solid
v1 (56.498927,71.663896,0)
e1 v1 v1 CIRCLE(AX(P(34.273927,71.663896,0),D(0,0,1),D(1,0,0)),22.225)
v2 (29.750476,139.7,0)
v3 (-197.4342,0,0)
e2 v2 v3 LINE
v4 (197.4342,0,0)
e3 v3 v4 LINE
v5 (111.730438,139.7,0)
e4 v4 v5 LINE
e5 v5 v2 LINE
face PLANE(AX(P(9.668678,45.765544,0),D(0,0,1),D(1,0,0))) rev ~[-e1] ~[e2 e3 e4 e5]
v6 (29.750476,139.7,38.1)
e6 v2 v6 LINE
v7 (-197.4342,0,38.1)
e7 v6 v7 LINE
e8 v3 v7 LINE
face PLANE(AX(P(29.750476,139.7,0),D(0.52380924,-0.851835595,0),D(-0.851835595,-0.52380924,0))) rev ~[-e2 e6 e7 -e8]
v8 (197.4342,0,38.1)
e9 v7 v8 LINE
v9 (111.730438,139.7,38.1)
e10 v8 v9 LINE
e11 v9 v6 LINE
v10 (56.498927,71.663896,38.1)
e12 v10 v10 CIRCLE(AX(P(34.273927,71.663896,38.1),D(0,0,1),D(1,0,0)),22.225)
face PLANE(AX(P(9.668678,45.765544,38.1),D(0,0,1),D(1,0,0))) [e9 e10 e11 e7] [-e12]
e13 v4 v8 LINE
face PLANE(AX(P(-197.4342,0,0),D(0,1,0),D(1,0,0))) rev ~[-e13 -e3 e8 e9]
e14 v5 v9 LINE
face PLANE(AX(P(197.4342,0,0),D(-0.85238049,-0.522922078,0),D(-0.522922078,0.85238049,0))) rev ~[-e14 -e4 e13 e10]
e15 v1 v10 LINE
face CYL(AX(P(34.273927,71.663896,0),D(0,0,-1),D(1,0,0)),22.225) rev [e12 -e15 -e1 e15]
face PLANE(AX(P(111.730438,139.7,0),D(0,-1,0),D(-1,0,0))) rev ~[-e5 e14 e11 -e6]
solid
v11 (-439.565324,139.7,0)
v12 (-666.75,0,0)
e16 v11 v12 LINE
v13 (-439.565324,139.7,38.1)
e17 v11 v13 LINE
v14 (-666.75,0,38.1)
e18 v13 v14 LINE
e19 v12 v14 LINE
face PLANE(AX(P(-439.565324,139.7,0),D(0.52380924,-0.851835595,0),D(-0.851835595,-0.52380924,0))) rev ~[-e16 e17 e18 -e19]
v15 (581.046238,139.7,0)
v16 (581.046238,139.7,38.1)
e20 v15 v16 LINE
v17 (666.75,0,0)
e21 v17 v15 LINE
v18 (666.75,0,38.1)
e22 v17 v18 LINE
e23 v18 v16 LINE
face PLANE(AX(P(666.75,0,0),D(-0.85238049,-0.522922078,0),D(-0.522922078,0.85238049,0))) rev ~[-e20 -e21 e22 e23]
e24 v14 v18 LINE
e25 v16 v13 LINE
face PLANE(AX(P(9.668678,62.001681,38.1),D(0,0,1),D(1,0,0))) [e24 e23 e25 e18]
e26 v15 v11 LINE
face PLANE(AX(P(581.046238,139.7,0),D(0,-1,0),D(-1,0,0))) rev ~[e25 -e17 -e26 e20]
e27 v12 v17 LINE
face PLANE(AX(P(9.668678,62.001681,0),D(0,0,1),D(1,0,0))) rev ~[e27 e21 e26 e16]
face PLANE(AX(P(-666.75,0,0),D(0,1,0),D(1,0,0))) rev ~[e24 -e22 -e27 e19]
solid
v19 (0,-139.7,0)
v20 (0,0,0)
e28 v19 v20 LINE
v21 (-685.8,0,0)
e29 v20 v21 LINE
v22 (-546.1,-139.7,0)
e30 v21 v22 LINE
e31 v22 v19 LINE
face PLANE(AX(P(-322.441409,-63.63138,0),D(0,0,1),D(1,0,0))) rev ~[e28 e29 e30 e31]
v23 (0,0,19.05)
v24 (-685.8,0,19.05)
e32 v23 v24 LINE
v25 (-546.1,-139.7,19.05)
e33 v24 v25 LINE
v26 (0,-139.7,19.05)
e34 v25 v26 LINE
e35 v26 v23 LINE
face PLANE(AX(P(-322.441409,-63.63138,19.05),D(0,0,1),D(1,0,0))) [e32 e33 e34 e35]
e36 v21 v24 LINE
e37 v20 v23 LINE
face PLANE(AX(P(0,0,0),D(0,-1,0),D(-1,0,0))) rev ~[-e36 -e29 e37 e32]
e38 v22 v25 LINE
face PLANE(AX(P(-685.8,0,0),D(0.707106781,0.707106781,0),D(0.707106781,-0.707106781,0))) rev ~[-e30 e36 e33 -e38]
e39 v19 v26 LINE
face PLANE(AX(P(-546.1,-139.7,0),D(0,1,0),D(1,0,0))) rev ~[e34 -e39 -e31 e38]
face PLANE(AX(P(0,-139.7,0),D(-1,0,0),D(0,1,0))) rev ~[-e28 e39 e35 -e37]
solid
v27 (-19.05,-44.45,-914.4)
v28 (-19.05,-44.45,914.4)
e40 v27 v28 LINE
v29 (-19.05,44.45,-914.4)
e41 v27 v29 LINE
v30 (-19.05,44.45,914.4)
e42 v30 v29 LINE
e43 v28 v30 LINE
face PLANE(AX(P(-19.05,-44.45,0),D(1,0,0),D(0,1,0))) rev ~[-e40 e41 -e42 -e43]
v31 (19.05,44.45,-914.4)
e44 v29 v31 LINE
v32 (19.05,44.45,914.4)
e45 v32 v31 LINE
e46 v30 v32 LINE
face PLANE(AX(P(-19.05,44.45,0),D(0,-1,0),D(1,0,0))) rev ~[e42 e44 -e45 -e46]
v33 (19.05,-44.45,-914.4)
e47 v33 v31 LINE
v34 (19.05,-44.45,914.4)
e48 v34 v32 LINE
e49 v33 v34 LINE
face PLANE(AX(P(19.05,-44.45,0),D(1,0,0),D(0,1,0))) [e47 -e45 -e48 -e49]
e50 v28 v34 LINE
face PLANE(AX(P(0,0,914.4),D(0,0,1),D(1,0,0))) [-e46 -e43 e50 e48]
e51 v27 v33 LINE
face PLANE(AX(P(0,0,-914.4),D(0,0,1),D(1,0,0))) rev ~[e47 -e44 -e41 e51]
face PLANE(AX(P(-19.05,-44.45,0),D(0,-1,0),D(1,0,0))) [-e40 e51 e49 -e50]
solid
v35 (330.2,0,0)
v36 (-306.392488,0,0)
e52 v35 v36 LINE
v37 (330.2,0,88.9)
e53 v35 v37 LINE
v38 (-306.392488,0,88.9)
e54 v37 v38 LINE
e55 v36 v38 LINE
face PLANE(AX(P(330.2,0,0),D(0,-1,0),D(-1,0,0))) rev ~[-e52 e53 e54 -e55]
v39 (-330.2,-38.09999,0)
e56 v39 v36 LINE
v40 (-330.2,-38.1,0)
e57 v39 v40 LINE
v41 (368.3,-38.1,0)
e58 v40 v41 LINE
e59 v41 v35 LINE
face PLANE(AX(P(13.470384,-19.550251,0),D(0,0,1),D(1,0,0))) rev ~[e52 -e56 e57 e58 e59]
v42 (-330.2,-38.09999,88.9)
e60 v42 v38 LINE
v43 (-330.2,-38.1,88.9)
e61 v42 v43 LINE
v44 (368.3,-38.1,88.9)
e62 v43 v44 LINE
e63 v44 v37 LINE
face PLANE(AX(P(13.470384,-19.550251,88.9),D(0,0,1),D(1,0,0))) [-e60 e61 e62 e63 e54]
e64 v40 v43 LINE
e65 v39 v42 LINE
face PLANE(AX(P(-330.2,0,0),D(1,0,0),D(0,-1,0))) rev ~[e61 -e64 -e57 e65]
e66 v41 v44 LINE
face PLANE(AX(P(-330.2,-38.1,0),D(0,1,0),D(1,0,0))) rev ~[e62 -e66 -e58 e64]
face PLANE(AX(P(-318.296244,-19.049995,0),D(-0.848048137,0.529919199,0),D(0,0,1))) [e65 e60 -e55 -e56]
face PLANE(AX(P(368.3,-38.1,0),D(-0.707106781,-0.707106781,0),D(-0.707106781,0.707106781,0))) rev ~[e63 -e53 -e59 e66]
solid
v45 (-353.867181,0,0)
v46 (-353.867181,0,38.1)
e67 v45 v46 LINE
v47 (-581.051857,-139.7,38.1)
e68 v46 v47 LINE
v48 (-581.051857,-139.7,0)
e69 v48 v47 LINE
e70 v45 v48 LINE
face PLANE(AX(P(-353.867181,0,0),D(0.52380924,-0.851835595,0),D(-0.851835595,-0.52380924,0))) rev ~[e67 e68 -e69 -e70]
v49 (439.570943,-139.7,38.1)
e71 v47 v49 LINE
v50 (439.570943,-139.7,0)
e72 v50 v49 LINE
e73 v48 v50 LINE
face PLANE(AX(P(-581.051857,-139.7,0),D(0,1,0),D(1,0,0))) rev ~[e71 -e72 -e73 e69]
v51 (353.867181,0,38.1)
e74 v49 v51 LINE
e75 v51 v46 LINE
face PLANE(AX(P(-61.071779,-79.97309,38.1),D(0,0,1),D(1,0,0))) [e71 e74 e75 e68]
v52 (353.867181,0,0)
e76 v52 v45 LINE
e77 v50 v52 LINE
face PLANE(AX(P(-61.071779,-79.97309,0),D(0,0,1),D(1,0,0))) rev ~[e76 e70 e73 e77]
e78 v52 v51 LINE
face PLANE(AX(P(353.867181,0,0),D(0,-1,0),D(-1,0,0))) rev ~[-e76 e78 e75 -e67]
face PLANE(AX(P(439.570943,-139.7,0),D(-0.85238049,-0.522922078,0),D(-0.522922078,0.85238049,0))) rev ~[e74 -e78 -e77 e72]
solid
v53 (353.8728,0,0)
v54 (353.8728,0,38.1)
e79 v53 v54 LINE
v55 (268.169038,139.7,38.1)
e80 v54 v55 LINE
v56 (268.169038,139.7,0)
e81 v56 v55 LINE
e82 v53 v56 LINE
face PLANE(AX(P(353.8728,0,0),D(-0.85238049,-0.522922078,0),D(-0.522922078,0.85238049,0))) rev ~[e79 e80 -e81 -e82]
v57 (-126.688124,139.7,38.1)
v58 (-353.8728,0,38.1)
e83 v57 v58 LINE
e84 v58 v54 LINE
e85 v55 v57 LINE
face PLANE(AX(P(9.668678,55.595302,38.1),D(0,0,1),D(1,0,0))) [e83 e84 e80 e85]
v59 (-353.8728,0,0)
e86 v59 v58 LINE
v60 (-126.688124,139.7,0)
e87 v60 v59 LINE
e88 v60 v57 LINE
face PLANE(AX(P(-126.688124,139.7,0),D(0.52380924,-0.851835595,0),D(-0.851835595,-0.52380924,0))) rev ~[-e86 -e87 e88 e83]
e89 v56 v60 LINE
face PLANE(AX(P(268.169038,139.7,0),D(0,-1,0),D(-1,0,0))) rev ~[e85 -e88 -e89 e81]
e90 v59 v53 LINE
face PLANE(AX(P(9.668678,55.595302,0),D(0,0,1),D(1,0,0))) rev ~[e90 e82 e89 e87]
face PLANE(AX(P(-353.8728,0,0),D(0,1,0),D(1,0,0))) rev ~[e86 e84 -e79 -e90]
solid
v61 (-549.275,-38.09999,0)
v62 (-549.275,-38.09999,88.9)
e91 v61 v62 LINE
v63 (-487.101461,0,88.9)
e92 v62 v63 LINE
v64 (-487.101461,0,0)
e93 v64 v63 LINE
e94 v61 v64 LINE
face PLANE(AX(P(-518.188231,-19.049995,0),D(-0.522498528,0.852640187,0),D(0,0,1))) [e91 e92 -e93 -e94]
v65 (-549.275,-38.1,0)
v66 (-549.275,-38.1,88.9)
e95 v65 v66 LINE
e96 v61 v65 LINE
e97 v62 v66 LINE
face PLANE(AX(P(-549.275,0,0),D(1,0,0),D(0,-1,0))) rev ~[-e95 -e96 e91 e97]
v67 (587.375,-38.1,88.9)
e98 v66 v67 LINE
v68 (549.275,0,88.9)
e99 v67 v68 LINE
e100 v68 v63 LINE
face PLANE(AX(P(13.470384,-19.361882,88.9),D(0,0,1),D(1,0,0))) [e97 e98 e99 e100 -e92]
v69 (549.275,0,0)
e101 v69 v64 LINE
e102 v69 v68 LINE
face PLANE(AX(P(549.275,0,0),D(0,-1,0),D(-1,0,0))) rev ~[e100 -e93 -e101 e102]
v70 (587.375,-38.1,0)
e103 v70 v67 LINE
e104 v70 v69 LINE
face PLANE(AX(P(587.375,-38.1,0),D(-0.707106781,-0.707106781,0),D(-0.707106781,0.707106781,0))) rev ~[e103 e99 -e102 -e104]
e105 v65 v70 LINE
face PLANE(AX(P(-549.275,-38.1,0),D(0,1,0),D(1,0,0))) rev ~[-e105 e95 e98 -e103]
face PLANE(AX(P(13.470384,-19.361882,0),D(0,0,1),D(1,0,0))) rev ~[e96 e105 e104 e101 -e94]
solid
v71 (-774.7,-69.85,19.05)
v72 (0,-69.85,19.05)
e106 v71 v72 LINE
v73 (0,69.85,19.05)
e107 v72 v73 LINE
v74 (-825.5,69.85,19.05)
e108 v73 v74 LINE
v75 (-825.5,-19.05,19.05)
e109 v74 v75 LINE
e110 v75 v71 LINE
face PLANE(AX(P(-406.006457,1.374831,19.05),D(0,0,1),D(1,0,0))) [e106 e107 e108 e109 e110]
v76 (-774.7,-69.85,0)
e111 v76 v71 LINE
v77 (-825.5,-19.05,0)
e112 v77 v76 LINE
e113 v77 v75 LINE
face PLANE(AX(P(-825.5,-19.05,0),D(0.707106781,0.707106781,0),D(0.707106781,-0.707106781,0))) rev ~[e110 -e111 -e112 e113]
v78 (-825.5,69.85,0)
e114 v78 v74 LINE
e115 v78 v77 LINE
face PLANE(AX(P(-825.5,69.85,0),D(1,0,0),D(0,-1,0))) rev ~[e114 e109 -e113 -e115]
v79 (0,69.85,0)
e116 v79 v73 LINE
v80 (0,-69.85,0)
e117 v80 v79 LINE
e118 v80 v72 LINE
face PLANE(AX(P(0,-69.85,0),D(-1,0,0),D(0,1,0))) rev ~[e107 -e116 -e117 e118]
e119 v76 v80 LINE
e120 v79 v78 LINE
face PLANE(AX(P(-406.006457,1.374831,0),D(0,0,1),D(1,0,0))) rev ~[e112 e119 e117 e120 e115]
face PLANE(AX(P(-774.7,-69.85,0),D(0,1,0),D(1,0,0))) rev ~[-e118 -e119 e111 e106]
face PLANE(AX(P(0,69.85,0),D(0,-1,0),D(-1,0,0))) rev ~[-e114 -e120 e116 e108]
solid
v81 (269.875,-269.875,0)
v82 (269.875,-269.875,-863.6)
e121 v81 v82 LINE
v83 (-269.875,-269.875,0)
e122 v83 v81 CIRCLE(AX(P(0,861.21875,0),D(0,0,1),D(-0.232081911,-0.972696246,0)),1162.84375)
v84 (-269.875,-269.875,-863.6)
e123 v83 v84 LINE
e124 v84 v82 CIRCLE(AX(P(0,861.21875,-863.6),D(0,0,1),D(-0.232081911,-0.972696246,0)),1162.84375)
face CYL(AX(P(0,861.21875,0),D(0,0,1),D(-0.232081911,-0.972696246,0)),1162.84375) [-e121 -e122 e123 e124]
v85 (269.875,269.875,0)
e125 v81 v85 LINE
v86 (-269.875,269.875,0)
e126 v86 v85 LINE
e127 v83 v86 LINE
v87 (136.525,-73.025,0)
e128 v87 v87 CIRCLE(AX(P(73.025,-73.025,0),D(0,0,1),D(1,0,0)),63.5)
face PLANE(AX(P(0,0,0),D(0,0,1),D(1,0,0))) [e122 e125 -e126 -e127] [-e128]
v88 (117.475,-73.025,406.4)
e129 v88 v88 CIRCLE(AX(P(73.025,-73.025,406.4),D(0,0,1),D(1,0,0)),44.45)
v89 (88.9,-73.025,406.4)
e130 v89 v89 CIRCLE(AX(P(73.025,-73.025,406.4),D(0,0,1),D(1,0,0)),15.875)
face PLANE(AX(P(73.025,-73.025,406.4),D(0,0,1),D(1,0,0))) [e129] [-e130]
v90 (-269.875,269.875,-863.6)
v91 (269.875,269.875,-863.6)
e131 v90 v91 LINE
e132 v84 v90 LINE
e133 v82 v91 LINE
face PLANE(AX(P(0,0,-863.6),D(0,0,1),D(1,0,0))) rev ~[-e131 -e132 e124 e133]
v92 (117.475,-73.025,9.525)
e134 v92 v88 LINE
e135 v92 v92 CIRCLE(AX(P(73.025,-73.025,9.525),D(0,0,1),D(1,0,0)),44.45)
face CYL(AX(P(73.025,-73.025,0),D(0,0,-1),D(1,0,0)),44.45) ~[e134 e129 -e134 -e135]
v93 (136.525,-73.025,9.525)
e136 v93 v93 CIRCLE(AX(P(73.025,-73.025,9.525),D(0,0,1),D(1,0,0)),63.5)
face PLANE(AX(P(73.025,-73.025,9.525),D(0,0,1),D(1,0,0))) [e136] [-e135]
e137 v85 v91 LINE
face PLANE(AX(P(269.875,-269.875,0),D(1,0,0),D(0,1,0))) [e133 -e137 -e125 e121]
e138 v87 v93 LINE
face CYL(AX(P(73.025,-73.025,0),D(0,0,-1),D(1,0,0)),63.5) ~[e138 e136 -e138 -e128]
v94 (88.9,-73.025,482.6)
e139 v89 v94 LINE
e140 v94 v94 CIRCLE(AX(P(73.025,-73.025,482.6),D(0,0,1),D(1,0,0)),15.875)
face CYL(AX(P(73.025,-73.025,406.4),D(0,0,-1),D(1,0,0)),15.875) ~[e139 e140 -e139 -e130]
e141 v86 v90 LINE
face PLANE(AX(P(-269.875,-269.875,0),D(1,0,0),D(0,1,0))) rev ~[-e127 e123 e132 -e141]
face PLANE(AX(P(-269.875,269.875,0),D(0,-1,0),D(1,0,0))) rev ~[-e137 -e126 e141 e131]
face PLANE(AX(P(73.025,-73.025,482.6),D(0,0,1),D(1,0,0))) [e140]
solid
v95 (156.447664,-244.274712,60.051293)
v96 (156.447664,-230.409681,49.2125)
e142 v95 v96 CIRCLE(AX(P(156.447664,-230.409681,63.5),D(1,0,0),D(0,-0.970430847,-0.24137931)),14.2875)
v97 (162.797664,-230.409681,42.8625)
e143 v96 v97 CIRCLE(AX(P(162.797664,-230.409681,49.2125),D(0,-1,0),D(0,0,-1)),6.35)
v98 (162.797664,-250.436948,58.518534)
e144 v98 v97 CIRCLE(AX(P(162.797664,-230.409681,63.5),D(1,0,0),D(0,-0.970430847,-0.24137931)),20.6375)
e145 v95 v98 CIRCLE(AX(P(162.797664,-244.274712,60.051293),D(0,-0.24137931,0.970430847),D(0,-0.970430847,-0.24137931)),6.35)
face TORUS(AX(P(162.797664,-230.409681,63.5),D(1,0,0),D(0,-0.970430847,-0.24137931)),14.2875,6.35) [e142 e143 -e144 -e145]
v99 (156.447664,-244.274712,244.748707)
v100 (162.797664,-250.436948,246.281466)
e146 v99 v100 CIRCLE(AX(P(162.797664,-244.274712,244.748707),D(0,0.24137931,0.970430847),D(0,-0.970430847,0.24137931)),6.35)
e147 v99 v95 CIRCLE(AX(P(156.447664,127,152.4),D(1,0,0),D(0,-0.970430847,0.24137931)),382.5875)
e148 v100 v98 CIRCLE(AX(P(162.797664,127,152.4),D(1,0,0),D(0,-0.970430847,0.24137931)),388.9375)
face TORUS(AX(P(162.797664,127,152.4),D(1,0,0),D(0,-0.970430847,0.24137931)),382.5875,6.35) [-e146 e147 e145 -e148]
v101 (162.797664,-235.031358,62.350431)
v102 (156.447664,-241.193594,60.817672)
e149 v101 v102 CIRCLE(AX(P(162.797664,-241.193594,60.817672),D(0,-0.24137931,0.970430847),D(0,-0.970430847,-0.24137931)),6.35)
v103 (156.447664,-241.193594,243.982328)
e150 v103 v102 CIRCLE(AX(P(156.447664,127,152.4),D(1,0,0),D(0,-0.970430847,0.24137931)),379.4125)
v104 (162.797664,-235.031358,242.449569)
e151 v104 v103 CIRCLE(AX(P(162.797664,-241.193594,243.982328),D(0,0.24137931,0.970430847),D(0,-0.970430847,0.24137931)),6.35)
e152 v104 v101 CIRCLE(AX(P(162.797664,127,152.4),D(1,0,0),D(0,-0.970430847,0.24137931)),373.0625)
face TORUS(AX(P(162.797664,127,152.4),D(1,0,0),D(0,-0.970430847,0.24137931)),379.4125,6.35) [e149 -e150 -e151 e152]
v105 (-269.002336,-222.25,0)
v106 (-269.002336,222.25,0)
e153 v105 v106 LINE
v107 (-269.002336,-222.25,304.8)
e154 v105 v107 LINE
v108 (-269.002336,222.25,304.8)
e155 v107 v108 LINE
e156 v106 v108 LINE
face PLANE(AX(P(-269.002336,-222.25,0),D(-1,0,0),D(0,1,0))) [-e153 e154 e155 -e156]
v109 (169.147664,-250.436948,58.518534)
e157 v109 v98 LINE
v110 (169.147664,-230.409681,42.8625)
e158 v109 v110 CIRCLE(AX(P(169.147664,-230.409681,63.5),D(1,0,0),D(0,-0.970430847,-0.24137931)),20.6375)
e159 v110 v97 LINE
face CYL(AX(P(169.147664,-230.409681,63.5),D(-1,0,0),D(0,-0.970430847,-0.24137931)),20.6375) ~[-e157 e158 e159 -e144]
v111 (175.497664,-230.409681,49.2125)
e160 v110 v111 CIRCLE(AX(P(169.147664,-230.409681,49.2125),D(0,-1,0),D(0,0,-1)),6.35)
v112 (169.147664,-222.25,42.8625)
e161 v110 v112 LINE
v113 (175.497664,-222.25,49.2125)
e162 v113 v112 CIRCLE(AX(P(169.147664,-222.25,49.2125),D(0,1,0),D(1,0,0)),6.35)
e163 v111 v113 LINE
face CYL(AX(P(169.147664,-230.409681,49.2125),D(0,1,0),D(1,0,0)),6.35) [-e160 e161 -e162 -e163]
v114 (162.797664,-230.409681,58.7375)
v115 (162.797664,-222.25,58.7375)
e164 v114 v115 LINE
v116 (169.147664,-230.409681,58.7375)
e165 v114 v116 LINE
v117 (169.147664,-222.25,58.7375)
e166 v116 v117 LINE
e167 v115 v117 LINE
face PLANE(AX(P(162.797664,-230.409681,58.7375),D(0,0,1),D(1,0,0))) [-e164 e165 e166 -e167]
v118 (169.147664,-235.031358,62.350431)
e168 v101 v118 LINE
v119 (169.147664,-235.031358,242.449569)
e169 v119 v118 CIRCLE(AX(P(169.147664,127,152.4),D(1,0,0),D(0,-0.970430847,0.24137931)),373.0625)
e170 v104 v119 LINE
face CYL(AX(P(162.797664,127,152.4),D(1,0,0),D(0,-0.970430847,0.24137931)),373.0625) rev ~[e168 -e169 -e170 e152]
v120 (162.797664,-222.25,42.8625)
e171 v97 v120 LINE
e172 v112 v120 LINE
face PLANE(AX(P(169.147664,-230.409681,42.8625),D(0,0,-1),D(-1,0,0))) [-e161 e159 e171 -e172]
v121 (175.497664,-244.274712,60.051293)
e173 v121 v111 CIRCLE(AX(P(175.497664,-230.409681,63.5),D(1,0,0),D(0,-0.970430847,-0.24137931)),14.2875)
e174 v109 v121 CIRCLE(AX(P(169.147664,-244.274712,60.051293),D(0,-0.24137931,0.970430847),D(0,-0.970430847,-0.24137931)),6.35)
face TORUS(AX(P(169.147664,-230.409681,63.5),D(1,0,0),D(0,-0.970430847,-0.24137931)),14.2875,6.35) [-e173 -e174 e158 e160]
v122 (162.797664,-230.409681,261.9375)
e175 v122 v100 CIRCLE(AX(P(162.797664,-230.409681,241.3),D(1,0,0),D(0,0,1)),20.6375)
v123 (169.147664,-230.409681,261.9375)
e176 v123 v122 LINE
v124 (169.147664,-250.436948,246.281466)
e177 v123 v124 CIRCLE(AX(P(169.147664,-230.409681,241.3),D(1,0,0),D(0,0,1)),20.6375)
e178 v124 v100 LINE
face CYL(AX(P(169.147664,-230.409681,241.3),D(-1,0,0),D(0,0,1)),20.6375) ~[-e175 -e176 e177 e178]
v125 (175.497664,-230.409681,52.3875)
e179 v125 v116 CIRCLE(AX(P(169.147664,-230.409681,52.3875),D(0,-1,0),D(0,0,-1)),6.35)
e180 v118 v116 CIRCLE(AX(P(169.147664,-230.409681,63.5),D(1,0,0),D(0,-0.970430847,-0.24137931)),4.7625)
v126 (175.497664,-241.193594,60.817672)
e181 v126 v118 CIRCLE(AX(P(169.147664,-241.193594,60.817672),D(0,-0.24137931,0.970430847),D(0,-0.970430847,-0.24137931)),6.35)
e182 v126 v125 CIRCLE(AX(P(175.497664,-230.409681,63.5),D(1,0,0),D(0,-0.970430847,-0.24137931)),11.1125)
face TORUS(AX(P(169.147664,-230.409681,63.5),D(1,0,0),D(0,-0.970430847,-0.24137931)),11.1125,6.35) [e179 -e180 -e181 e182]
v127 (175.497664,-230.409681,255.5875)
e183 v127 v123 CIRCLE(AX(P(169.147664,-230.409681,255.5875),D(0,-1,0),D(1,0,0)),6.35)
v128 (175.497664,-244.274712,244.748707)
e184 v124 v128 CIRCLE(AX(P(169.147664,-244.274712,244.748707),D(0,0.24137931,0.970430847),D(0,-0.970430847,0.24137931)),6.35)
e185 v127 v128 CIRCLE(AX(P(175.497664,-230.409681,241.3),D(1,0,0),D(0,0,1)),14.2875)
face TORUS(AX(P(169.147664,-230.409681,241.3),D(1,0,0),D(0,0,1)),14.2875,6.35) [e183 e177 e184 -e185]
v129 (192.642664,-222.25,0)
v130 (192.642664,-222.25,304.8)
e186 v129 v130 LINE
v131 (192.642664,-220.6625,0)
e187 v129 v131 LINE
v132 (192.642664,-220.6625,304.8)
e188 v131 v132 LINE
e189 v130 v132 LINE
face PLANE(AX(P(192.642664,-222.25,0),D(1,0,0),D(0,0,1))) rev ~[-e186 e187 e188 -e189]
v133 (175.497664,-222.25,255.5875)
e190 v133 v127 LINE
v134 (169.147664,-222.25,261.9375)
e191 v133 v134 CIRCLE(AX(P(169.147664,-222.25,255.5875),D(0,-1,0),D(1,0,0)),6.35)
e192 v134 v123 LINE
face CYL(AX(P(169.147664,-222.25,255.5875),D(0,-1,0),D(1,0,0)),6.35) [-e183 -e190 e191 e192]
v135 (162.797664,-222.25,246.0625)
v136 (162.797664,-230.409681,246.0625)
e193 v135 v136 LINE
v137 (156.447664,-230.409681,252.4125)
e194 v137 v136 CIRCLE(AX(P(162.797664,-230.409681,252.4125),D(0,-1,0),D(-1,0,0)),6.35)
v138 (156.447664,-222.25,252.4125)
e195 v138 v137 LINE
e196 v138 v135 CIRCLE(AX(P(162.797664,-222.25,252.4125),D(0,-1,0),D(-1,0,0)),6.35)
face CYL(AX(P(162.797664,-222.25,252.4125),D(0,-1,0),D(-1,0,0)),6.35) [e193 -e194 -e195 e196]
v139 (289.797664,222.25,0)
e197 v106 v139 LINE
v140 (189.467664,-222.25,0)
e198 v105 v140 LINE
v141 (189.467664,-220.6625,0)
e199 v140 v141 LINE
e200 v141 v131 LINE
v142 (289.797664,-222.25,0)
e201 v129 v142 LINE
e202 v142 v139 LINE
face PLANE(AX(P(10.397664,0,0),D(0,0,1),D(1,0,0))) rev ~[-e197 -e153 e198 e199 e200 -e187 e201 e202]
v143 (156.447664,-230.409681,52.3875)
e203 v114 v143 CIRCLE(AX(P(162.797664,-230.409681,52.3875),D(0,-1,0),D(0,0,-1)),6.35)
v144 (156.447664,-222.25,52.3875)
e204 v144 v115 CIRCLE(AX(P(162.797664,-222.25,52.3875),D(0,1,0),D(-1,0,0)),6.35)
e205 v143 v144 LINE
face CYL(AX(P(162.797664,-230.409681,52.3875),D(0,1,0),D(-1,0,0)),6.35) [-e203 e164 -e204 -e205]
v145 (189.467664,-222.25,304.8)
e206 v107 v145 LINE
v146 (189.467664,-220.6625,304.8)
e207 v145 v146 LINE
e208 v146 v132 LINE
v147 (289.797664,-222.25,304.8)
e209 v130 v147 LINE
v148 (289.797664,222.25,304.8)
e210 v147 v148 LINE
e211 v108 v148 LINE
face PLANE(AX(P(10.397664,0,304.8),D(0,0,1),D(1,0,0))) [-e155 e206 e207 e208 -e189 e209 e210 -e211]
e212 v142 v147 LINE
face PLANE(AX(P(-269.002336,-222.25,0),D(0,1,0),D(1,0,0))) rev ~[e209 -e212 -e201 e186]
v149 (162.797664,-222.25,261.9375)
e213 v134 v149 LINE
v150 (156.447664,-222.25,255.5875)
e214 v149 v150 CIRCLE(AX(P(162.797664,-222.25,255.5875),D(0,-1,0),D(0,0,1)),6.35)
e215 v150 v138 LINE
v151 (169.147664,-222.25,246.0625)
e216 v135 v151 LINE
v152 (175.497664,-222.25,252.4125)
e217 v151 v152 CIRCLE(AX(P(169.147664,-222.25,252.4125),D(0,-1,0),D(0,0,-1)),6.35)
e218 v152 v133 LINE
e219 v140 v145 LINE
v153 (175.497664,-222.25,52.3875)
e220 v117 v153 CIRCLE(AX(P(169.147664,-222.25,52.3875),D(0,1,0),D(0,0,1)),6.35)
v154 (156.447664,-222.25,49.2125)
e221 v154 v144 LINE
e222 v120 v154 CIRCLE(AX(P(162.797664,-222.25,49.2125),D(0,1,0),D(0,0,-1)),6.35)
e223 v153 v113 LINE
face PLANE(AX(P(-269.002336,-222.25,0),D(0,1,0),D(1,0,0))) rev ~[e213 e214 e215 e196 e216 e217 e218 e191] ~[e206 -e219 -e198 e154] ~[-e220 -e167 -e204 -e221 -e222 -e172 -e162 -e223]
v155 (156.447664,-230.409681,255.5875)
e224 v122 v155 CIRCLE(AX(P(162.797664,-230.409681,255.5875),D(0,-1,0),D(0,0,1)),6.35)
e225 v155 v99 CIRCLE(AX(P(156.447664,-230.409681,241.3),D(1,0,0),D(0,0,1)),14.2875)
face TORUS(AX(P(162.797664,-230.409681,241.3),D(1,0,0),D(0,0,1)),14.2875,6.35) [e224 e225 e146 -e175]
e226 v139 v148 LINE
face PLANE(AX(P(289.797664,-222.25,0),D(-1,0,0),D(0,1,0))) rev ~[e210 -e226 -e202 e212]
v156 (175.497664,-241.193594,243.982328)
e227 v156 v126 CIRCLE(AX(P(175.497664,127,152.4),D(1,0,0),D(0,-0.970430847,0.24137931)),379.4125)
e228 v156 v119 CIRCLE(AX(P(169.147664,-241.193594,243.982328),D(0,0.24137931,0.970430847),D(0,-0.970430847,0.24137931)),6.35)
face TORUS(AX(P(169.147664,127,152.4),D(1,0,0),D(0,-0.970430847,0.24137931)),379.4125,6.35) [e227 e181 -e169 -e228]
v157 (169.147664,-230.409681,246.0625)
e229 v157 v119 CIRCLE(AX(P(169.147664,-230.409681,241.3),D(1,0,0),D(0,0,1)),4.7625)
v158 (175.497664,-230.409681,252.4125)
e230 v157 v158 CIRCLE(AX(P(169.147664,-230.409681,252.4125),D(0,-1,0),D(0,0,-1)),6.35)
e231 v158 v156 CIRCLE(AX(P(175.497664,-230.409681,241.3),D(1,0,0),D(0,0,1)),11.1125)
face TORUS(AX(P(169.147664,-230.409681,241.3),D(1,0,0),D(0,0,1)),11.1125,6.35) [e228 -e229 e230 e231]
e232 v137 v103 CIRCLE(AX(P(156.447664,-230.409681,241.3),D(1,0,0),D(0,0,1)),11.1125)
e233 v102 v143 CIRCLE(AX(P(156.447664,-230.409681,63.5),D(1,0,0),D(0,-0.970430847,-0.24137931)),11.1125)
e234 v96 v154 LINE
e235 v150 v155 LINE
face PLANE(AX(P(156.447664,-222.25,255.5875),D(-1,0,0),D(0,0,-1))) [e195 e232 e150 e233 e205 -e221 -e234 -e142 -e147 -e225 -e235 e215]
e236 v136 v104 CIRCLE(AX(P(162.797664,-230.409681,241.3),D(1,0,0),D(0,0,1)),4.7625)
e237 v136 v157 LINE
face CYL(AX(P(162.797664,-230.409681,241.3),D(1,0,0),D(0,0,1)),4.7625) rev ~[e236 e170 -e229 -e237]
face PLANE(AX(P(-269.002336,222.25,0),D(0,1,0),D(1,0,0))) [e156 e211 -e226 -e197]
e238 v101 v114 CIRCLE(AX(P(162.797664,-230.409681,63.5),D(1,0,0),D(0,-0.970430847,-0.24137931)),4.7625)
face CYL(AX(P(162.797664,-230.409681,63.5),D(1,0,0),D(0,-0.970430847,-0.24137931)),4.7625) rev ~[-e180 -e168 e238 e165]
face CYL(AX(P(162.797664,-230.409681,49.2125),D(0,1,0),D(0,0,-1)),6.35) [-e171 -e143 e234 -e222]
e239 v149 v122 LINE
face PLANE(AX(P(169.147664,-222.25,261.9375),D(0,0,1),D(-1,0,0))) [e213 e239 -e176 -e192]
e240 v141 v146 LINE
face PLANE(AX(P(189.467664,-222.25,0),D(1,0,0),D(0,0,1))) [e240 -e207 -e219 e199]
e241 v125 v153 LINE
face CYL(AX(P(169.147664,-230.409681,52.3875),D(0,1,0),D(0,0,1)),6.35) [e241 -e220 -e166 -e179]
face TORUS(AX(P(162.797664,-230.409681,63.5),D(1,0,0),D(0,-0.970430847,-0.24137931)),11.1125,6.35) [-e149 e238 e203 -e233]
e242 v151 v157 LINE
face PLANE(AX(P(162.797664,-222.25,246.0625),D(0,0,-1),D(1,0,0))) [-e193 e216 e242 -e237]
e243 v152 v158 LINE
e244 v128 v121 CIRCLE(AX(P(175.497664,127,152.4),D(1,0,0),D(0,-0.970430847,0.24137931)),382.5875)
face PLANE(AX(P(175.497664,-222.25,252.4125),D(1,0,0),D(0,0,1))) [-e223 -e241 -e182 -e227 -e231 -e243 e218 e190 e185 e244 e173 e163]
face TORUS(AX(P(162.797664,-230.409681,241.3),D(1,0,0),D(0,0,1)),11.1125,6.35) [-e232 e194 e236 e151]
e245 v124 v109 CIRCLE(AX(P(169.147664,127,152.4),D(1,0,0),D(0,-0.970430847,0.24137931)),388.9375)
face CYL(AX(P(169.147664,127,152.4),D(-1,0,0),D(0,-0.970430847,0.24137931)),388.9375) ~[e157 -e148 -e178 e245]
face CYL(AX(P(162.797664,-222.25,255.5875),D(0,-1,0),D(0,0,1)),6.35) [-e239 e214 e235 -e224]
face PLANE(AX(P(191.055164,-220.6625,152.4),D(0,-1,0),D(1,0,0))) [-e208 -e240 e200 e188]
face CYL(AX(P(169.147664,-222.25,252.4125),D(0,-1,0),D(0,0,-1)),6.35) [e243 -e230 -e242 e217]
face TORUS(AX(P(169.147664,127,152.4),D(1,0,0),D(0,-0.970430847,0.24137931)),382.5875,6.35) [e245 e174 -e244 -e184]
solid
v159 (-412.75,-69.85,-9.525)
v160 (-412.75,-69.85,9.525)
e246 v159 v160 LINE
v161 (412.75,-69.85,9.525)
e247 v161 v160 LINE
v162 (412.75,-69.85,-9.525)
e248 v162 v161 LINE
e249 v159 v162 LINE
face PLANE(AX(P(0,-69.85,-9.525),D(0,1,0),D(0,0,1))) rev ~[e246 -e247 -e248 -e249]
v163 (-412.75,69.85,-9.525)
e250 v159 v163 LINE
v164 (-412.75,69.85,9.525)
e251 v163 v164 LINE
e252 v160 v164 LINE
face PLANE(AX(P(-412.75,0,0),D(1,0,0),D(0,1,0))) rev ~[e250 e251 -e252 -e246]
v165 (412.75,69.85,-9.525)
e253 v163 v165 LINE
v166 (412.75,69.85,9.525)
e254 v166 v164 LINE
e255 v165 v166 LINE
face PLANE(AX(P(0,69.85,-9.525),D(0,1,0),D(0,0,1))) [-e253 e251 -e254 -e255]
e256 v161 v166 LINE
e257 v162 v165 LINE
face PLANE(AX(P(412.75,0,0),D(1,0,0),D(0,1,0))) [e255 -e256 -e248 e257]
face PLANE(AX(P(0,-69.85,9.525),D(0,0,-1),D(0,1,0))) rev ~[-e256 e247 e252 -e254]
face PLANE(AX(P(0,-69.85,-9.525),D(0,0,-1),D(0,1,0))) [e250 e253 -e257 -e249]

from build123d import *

# Parameters (mm, degrees)
F0_W      = 539.75
F0_H      = 539.75
F0_R      = 63.5
F0_R_2    = 44.45
F1_DEPTH  = 863.6
F2_DEPTH  = 406.4
F3_DEPTH  = 9.525
F6_R      = 15.875
F7_DEPTH  = 76.2
F8_W      = 558.8
F8_H      = 444.5
F9_DEPTH  = 304.8
F14_W     = 3.175
F14_H     = 304.8
F15_DEPTH = 1.5875
F16_W     = 139.7
F16_H     = 19.05
F17_DEPTH = 412.75
F19_DEPTH = 19.05
F21_DEPTH = 19.05
F22_W     = 38.1
F22_H     = 88.9
F23_DEPTH = 914.4
F25_DEPTH = 38.1
F27_DEPTH = 88.9
F29_DEPTH = 88.9
F30_SIZE2 = 23.807512
F30_SIZE  = 38.09999
F31_SIZE2 = 62.173539
F31_SIZE  = 38.09999
F33_DEPTH = 38.1
F35_DEPTH = 38.1
F36_R     = 22.225
F37_DEPTH = 38.1


# Not quite as in the source:
# - a fillet or chamfer is up to 0.001 mm smaller than in the source, because OpenCascade refuses the exact size


with BuildPart() as f1:
    # F0 (on Top) → F1 (new body)
    with BuildSketch(Plane.XY):
        Rectangle(F0_W, F0_H)
        with Locations((73.025, -73.025)):
            Circle(F0_R, mode=Mode.SUBTRACT)
        with BuildLine():
            ThreePointArc((-269.875, -269.875), (0, -301.625), (269.875, -269.875))
            Line((269.875, -269.875), (-269.875, -269.875))
        make_face()
        with Locations((73.025, -73.025)):
            Circle(F0_R)
        with Locations((73.025, -73.025)):
            Circle(F0_R_2, mode=Mode.SUBTRACT)
        with Locations((73.025, -73.025)):
            Circle(F0_R_2)
    extrude(amount=-F1_DEPTH)

    # F0 (on Top) → F2 (join)
    with BuildSketch(Plane.XY):
        with Locations((73.025, -73.025)):
            Circle(F0_R_2)
    extrude(amount=F2_DEPTH)

    # F0 (on Top) → F3 (join)
    with BuildSketch(Plane.XY):
        with Locations((73.025, -73.025)):
            Circle(F0_R)
        with Locations((73.025, -73.025)):
            Circle(F0_R_2, mode=Mode.SUBTRACT)
    extrude(amount=F3_DEPTH)

    # F6 (on face) → F7 (join)
    with BuildSketch(Plane.XY.offset(406.4)):
        with Locations((73.025, -73.025)):
            Circle(F6_R)
    extrude(amount=F7_DEPTH)


with BuildPart() as f9:
    # F8 (on Top) → F9 (new body)
    with BuildSketch(Plane.XY):
        with Locations((10.3976642355, 0)):
            Rectangle(F8_W, F8_H)
    extrude(amount=F9_DEPTH)

    # F13: sweep along a path in F12
    with BuildLine(Plane.YZ.offset(161.925)) as f13_path:
        Line((-222.25, 254), (-230.4096808985, 254))
        ThreePointArc((-230.4096808985, 254), (-238.2313792766, 251.3055501839), (-242.7341526537, 244.3655172414))
        ThreePointArc((-242.7341526537, 244.3655172414), (-254, 152.4), (-242.7341526537, 60.4344827586))
        ThreePointArc((-242.7341526537, 60.4344827586), (-238.2313792766, 53.4944498161), (-230.4096808985, 50.8))
        Line((-230.4096808985, 50.8), (-222.25, 50.8))
    # F10 (on face) → F13 (sweep)
    with BuildSketch(Plane.XZ.offset(222.25)):
        with BuildLine():
            Line((162.7976642355, 246.0625), (169.1476642355, 246.0625))
            ThreePointArc((169.1476642355, 246.0625), (173.637792296, 247.9223719395), (175.4976642355, 252.4125))
            Line((175.4976642355, 252.4125), (175.4976642355, 255.5875))
            ThreePointArc((175.4976642355, 255.5875), (173.637792296, 260.0776280605), (169.1476642355, 261.9375))
            Line((169.1476642355, 261.9375), (162.7976642355, 261.9375))
            ThreePointArc((162.7976642355, 261.9375), (158.3075361749, 260.0776280605), (156.4476642355, 255.5875))
            Line((156.4476642355, 255.5875), (156.4476642355, 252.4125))
            ThreePointArc((156.4476642355, 252.4125), (158.3075361749, 247.9223719395), (162.7976642355, 246.0625))
        make_face()
    sweep(path=f13_path.line)

    # F14 (on face) → F15 (cut)
    with BuildSketch(Plane.XZ.offset(222.25)):
        with Locations((191.0551642355, 152.4)):
            Rectangle(F14_W, F14_H)
    extrude(amount=-F15_DEPTH, mode=Mode.SUBTRACT)


with BuildPart() as f17:
    # F16 (on Right) → F17 (new body, symmetric)
    with BuildSketch(Plane.YZ):
        Rectangle(F16_W, F16_H)
    extrude(amount=F17_DEPTH, both=True)


with BuildPart() as f19:
    # F18 (on Top) → F19 (new body)
    with BuildSketch(Plane.XY):
        Polygon((-825.5, -19.05), (-774.7, -69.85), (0, -69.85), (0, 69.85), (-825.5, 69.85), align=None)
    extrude(amount=F19_DEPTH)


with BuildPart() as f21:
    # F20 (on Top) → F21 (new body)
    with BuildSketch(Plane.XY):
        Polygon((0, -139.7), (0, 0), (-685.8, 0), (-546.1, -139.7), align=None)
    extrude(amount=F21_DEPTH)


with BuildPart() as f23:
    # F22 (on Top) → F23 (new body, symmetric)
    with BuildSketch(Plane.XY):
        Rectangle(F22_W, F22_H)
    extrude(amount=F23_DEPTH, both=True)


with BuildPart() as f25:
    # F24 (on Top) → F25 (new body)
    with BuildSketch(Plane.XY):
        Polygon((-666.75, 0), (666.75, 0), (581.0462384661, 139.7), (-439.5653237969, 139.7), align=None)
    extrude(amount=F25_DEPTH)


with BuildPart() as f27:
    # F26 (on Top) → F27 (new body)
    with BuildSketch(Plane.XY):
        Polygon((549.275, 0), (-549.275, 0), (-549.275, -38.1), (587.375, -38.1), align=None)
    extrude(amount=F27_DEPTH)

    # F31 (size 38.1 and 62.1735492796 in the source; OpenCascade refuses exactly that, so slightly less here)
    f31_edges = [f27.edges().sort_by_distance(p)[0] for p in [
        (-549.275, 0, 44.45),
    ]]
    f31_side = f27.faces().sort_by_distance((-549.275, -19.05, 44.45))[0]
    chamfer(f31_edges, length=F31_SIZE, length2=F31_SIZE2, reference=f31_side)


with BuildPart() as f29:
    # F28 (on Top) → F29 (new body)
    with BuildSketch(Plane.XY):
        Polygon((330.2, 0), (-330.2, 0), (-330.2, -38.1), (368.3, -38.1), align=None)
    extrude(amount=F29_DEPTH)

    # F30 (size 38.1 and 23.8075223077 in the source; OpenCascade refuses exactly that, so slightly less here)
    f30_edges = [f29.edges().sort_by_distance(p)[0] for p in [
        (-330.2, 0, 44.45),
    ]]
    f30_side = f29.faces().sort_by_distance((-330.2, -19.05, 44.45))[0]
    chamfer(f30_edges, length=F30_SIZE, length2=F30_SIZE2, reference=f30_side)


with BuildPart() as f33:
    # F32 (on Top) → F33 (new body)
    with BuildSketch(Plane.XY):
        Polygon((-581.0518573346, -139.7), (439.5709426654, -139.7), (353.8671811315, 0), (-353.8671811315, 0), align=None)
    extrude(amount=F33_DEPTH)


with BuildPart() as f35:
    # F34 (on Top) → F35 (new body)
    with BuildSketch(Plane.XY):
        Polygon((-353.8728, 0), (353.8728, 0), (268.1690384661, 139.7), (-126.6881237969, 139.7), align=None)
    extrude(amount=F35_DEPTH)


with BuildPart() as f37:
    # F36 (on Top) → F37 (new body)
    with BuildSketch(Plane.XY):
        Polygon((-197.4342, 0), (197.4342, 0), (111.7304384661, 139.7), (29.7504762031, 139.7), align=None)
        with Locations((34.2739268669, 71.6638964194)):
            Circle(F36_R, mode=Mode.SUBTRACT)
    extrude(amount=F37_DEPTH)


solid = Compound([f1.part, f9.part, f17.part, f19.part, f21.part, f23.part, f25.part, f27.part, f29.part, f33.part, f35.part, f37.part])
